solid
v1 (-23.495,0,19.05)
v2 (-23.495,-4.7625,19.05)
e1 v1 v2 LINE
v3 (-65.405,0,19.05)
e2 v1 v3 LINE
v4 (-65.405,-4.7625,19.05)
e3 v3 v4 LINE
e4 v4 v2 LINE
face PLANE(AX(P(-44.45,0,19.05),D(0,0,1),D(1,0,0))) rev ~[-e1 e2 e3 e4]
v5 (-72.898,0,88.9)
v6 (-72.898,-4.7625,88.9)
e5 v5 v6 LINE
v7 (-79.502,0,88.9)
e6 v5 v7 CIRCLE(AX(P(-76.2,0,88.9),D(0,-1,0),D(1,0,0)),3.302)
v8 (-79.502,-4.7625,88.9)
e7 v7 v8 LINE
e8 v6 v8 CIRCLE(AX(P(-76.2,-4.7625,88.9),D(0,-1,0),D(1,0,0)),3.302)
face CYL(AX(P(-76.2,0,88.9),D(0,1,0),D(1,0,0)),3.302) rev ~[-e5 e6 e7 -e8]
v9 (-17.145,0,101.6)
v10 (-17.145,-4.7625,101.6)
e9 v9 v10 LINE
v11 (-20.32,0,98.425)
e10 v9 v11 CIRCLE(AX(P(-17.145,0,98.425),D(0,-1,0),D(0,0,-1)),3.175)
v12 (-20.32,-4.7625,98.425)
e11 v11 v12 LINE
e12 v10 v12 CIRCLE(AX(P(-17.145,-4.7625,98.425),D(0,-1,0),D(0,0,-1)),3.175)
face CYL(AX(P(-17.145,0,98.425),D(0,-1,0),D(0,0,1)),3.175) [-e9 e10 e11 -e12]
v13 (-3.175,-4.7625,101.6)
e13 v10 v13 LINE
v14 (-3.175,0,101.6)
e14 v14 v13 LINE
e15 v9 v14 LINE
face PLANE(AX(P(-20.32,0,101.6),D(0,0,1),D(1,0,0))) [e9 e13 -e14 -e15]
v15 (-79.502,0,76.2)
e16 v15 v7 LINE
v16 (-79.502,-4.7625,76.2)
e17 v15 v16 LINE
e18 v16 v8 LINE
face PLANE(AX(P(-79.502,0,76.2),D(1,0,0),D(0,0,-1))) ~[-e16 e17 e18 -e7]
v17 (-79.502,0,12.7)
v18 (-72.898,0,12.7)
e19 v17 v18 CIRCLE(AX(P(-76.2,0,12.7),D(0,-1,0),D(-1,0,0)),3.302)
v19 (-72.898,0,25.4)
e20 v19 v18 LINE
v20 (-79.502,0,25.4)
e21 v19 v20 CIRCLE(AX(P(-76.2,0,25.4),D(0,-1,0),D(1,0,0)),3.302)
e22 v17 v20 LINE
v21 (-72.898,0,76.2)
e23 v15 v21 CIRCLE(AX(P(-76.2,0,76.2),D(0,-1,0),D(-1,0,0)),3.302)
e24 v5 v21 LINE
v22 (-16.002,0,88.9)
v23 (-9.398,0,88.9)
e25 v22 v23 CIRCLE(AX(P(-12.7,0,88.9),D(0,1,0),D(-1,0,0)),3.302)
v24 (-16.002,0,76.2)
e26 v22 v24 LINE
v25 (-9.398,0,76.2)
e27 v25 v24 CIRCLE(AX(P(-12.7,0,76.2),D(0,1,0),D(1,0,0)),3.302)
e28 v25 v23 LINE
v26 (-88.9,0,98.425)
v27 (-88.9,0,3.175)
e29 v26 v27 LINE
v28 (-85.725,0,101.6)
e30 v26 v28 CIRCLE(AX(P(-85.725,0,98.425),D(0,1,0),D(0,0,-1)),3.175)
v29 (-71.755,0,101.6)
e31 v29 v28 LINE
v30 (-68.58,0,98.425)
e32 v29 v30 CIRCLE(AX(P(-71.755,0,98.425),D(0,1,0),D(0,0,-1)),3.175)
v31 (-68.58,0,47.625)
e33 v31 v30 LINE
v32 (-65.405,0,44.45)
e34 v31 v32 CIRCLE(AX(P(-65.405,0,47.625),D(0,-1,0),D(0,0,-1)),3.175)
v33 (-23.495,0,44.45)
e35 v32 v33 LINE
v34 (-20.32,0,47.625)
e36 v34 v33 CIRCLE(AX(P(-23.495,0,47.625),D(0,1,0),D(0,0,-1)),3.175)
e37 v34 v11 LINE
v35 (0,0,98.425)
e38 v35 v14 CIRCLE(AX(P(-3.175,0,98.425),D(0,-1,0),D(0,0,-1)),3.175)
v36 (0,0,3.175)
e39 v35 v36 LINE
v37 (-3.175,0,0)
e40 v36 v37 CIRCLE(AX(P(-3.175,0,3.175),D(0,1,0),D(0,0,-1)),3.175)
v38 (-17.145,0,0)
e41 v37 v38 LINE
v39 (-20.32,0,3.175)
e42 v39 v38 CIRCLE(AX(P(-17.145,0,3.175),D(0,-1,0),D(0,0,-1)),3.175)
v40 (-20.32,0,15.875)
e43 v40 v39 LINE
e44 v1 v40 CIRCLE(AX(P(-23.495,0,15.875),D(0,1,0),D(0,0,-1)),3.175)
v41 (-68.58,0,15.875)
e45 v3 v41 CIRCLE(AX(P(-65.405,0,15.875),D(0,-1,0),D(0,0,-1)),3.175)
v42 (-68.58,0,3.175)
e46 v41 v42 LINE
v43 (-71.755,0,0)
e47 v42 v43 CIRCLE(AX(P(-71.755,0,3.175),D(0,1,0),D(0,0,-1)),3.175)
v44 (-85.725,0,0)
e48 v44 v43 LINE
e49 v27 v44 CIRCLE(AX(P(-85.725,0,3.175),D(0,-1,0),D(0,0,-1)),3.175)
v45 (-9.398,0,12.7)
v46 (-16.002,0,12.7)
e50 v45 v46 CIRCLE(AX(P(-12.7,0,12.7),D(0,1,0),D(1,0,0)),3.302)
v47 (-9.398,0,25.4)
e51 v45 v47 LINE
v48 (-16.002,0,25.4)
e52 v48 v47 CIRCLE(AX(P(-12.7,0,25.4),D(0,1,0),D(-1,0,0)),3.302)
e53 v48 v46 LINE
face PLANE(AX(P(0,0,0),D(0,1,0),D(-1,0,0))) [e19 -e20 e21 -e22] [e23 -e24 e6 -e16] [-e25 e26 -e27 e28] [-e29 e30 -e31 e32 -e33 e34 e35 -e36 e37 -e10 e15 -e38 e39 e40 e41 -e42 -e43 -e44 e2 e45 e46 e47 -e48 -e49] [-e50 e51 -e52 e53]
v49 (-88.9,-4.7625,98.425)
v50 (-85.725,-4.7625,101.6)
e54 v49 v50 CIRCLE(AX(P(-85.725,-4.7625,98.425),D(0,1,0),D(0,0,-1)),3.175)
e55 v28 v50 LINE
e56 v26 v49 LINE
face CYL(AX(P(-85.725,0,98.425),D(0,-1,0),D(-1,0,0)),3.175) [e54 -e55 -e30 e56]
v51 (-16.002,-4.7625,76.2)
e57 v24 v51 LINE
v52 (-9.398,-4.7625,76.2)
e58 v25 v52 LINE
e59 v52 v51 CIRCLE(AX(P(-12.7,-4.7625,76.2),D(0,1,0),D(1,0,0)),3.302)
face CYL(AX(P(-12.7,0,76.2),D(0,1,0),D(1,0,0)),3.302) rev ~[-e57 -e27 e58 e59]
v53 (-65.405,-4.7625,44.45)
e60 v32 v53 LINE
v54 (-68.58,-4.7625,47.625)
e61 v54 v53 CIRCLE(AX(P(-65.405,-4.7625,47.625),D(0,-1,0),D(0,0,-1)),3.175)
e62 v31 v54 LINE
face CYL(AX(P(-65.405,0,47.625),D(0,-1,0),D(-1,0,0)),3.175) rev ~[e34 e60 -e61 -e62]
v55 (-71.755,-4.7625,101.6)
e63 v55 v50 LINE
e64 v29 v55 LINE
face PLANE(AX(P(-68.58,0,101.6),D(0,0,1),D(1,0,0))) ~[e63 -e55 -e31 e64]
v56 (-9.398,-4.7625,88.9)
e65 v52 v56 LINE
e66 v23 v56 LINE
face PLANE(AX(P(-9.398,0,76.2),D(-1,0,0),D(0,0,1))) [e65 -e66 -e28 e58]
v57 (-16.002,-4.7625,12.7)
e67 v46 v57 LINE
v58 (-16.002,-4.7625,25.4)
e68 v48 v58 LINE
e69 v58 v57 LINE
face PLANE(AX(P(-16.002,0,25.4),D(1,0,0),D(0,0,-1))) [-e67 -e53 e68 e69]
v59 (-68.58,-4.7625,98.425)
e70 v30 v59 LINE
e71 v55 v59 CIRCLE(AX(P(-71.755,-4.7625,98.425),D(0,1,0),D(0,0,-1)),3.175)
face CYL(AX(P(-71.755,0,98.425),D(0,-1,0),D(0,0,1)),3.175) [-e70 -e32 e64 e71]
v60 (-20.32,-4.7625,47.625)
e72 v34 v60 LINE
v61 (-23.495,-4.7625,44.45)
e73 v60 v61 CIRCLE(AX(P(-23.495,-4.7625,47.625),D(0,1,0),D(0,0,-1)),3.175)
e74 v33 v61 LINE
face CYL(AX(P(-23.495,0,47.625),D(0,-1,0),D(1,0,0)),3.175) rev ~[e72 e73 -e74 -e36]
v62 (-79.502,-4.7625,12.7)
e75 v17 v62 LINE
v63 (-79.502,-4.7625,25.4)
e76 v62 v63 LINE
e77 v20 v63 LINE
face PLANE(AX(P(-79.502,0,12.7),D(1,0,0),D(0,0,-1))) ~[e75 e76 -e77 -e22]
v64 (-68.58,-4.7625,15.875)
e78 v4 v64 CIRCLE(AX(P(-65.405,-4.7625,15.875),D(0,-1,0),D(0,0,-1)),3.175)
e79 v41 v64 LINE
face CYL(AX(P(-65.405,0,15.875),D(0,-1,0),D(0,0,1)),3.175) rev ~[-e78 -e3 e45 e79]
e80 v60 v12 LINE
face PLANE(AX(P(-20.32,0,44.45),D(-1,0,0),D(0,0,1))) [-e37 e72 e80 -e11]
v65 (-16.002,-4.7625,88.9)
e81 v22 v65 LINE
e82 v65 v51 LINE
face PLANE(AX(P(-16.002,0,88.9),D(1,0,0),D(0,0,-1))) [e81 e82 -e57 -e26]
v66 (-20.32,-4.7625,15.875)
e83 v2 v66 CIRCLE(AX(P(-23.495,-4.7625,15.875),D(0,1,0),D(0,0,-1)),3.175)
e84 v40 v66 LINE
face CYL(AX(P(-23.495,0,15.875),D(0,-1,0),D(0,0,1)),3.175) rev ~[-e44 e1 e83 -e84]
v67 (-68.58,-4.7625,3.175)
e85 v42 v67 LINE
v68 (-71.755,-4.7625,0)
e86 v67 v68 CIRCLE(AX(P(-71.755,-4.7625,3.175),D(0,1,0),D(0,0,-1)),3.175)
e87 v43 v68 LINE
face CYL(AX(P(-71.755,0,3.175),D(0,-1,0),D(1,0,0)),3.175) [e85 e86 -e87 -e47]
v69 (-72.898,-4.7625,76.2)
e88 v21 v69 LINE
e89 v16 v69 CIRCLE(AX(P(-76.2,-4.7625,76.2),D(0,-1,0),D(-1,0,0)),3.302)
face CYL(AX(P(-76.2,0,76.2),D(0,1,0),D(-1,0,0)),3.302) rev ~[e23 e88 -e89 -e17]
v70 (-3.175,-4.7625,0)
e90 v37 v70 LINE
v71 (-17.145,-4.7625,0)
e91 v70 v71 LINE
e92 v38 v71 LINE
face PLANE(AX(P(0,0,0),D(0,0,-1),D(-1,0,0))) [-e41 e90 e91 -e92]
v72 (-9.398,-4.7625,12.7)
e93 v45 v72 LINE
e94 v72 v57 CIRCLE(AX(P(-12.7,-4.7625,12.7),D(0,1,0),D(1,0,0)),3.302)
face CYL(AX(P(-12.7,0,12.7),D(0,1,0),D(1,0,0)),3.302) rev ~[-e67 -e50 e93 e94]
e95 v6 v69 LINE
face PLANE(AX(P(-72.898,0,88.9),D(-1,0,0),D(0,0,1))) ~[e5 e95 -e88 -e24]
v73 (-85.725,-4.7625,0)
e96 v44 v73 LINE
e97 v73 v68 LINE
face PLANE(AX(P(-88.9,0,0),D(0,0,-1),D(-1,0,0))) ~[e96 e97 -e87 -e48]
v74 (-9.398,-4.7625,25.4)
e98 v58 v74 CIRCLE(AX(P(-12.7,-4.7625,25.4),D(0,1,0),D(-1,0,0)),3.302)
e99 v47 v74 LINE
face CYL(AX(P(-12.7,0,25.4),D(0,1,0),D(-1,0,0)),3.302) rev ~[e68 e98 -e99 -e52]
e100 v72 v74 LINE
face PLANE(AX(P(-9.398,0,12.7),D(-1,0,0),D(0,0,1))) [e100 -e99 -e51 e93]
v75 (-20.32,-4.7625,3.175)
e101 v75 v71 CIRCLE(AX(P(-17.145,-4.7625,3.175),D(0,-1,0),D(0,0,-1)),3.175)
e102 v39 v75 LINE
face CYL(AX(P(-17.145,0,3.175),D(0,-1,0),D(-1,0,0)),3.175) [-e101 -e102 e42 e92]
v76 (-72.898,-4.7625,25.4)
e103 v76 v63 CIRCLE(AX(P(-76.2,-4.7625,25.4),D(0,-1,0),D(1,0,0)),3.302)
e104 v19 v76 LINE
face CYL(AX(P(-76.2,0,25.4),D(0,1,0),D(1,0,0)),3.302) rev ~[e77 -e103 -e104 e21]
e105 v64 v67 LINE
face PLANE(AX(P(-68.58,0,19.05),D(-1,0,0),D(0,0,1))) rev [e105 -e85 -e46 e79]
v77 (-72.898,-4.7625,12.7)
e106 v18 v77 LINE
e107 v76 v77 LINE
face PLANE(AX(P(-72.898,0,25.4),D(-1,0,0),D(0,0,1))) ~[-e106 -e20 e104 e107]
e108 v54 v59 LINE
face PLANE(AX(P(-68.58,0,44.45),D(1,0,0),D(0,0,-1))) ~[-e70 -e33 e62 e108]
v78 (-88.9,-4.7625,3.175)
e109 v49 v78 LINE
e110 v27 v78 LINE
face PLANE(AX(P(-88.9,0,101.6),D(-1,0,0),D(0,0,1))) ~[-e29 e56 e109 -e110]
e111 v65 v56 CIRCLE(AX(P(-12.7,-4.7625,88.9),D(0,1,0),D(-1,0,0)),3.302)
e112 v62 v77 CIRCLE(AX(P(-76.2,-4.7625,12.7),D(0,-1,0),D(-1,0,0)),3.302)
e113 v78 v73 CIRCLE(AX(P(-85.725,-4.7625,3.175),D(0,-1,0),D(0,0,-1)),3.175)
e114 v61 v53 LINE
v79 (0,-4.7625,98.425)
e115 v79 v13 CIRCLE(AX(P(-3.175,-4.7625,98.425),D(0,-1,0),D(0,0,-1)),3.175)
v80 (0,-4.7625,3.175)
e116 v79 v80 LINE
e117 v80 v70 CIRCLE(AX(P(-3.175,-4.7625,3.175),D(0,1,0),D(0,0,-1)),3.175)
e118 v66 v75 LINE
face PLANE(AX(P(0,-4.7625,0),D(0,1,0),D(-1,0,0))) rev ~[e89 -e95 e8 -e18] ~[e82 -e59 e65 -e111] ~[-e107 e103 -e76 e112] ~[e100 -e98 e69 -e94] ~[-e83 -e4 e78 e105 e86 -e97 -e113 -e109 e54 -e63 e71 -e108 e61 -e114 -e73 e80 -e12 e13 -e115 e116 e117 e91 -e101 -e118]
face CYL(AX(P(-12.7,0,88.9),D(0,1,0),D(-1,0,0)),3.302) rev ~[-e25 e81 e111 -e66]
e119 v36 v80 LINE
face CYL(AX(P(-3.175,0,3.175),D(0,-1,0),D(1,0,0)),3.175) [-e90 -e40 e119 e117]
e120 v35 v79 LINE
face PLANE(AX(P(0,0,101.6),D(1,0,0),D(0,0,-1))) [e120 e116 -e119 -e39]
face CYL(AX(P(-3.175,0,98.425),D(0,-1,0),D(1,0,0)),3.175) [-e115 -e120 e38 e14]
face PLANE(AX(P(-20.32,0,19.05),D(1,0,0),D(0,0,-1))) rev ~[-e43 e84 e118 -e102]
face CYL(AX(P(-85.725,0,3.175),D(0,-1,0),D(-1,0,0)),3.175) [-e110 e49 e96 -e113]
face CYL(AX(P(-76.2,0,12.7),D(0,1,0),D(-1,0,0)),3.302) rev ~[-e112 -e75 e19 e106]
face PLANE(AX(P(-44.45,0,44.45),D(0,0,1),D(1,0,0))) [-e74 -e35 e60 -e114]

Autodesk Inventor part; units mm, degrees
ref_plane "YZ Plane" through (0, 0, 0) normal (1, 0, 0) x (0, 1, 0)
ref_plane "XZ Plane" through (0, 0, 0) normal (0, 1, 0) x (-1, 0, 0)
ref_plane "XY Plane" through (0, 0, 0) normal (0, 0, 1) x (1, 0, 0)
sketch "Sketch1" plane through (0, 0, 0) normal (0, 1, 0) x (-1, 0, 0)
  line L0 (0, 0) -> (20.32, 0)
  line L1 (0, 101.6) -> (0, 0)
  line L2 (44.45, 44.45) -> (20.32, 44.45)
  line L3 (20.32, 44.45) -> (20.32, 101.6)
  line L4 (44.45, 44.45) -> (44.45, 19.05)
  line L5 (20.32, 101.6) -> (0, 101.6)
  line L6 (16.002, 88.9) -> (16.002, 76.2)
  line L7 (9.398, 76.2) -> (9.398, 88.9)
  arc A0 (16.002, 88.9) -> (9.398, 88.9) centre (12.7, 88.9) ccw
  arc A1 (9.398, 76.2) -> (16.002, 76.2) centre (12.7, 76.2) ccw
  line L8 (16.002, 25.4) -> (16.002, 12.7)
  line L9 (9.398, 12.7) -> (9.398, 25.4)
  arc A2 (16.002, 25.4) -> (9.398, 25.4) centre (12.7, 25.4) ccw
  arc A3 (9.398, 12.7) -> (16.002, 12.7) centre (12.7, 12.7) ccw
  line L10 (44.45, 19.05) -> (20.32, 19.05)
  line L11 (20.32, 19.05) -> (20.32, 0)
  dimension "d1" = 101.6
  dimension "d8" = 44.45
  dimension "d11" = 6.604
  dimension "d14" = 12.7
  dimension "d15" = 12.7
  dimension "d18" = 12.7
  dimension "d19" = 20.32
  dimension "d21" = 31.75
  dimension "d23" = 25.4
  dimension "d24" = 19.05
  dimension "d25" = 63.5
  dimension "d26" = 6.604
extrude "Extrusion1" add sketch "Sketch1" against normal blind 4.7625
fillet "Fillet1" radius 3.175 6 edges at (-20.32, -2.3813, 44.45) (-20.32, -2.3813, 101.6) (0, -2.3813, 101.6) (0, -2.3813, 0) (-20.32, -2.3813, 0) (-20.32, -2.3813, 19.05)
mirror "Mirror2" about plane through (-44.45, 0, 44.45) normal (-1, 0, 0)
equation "\"d26\" = d11"
properties part number "torchMount_back"
